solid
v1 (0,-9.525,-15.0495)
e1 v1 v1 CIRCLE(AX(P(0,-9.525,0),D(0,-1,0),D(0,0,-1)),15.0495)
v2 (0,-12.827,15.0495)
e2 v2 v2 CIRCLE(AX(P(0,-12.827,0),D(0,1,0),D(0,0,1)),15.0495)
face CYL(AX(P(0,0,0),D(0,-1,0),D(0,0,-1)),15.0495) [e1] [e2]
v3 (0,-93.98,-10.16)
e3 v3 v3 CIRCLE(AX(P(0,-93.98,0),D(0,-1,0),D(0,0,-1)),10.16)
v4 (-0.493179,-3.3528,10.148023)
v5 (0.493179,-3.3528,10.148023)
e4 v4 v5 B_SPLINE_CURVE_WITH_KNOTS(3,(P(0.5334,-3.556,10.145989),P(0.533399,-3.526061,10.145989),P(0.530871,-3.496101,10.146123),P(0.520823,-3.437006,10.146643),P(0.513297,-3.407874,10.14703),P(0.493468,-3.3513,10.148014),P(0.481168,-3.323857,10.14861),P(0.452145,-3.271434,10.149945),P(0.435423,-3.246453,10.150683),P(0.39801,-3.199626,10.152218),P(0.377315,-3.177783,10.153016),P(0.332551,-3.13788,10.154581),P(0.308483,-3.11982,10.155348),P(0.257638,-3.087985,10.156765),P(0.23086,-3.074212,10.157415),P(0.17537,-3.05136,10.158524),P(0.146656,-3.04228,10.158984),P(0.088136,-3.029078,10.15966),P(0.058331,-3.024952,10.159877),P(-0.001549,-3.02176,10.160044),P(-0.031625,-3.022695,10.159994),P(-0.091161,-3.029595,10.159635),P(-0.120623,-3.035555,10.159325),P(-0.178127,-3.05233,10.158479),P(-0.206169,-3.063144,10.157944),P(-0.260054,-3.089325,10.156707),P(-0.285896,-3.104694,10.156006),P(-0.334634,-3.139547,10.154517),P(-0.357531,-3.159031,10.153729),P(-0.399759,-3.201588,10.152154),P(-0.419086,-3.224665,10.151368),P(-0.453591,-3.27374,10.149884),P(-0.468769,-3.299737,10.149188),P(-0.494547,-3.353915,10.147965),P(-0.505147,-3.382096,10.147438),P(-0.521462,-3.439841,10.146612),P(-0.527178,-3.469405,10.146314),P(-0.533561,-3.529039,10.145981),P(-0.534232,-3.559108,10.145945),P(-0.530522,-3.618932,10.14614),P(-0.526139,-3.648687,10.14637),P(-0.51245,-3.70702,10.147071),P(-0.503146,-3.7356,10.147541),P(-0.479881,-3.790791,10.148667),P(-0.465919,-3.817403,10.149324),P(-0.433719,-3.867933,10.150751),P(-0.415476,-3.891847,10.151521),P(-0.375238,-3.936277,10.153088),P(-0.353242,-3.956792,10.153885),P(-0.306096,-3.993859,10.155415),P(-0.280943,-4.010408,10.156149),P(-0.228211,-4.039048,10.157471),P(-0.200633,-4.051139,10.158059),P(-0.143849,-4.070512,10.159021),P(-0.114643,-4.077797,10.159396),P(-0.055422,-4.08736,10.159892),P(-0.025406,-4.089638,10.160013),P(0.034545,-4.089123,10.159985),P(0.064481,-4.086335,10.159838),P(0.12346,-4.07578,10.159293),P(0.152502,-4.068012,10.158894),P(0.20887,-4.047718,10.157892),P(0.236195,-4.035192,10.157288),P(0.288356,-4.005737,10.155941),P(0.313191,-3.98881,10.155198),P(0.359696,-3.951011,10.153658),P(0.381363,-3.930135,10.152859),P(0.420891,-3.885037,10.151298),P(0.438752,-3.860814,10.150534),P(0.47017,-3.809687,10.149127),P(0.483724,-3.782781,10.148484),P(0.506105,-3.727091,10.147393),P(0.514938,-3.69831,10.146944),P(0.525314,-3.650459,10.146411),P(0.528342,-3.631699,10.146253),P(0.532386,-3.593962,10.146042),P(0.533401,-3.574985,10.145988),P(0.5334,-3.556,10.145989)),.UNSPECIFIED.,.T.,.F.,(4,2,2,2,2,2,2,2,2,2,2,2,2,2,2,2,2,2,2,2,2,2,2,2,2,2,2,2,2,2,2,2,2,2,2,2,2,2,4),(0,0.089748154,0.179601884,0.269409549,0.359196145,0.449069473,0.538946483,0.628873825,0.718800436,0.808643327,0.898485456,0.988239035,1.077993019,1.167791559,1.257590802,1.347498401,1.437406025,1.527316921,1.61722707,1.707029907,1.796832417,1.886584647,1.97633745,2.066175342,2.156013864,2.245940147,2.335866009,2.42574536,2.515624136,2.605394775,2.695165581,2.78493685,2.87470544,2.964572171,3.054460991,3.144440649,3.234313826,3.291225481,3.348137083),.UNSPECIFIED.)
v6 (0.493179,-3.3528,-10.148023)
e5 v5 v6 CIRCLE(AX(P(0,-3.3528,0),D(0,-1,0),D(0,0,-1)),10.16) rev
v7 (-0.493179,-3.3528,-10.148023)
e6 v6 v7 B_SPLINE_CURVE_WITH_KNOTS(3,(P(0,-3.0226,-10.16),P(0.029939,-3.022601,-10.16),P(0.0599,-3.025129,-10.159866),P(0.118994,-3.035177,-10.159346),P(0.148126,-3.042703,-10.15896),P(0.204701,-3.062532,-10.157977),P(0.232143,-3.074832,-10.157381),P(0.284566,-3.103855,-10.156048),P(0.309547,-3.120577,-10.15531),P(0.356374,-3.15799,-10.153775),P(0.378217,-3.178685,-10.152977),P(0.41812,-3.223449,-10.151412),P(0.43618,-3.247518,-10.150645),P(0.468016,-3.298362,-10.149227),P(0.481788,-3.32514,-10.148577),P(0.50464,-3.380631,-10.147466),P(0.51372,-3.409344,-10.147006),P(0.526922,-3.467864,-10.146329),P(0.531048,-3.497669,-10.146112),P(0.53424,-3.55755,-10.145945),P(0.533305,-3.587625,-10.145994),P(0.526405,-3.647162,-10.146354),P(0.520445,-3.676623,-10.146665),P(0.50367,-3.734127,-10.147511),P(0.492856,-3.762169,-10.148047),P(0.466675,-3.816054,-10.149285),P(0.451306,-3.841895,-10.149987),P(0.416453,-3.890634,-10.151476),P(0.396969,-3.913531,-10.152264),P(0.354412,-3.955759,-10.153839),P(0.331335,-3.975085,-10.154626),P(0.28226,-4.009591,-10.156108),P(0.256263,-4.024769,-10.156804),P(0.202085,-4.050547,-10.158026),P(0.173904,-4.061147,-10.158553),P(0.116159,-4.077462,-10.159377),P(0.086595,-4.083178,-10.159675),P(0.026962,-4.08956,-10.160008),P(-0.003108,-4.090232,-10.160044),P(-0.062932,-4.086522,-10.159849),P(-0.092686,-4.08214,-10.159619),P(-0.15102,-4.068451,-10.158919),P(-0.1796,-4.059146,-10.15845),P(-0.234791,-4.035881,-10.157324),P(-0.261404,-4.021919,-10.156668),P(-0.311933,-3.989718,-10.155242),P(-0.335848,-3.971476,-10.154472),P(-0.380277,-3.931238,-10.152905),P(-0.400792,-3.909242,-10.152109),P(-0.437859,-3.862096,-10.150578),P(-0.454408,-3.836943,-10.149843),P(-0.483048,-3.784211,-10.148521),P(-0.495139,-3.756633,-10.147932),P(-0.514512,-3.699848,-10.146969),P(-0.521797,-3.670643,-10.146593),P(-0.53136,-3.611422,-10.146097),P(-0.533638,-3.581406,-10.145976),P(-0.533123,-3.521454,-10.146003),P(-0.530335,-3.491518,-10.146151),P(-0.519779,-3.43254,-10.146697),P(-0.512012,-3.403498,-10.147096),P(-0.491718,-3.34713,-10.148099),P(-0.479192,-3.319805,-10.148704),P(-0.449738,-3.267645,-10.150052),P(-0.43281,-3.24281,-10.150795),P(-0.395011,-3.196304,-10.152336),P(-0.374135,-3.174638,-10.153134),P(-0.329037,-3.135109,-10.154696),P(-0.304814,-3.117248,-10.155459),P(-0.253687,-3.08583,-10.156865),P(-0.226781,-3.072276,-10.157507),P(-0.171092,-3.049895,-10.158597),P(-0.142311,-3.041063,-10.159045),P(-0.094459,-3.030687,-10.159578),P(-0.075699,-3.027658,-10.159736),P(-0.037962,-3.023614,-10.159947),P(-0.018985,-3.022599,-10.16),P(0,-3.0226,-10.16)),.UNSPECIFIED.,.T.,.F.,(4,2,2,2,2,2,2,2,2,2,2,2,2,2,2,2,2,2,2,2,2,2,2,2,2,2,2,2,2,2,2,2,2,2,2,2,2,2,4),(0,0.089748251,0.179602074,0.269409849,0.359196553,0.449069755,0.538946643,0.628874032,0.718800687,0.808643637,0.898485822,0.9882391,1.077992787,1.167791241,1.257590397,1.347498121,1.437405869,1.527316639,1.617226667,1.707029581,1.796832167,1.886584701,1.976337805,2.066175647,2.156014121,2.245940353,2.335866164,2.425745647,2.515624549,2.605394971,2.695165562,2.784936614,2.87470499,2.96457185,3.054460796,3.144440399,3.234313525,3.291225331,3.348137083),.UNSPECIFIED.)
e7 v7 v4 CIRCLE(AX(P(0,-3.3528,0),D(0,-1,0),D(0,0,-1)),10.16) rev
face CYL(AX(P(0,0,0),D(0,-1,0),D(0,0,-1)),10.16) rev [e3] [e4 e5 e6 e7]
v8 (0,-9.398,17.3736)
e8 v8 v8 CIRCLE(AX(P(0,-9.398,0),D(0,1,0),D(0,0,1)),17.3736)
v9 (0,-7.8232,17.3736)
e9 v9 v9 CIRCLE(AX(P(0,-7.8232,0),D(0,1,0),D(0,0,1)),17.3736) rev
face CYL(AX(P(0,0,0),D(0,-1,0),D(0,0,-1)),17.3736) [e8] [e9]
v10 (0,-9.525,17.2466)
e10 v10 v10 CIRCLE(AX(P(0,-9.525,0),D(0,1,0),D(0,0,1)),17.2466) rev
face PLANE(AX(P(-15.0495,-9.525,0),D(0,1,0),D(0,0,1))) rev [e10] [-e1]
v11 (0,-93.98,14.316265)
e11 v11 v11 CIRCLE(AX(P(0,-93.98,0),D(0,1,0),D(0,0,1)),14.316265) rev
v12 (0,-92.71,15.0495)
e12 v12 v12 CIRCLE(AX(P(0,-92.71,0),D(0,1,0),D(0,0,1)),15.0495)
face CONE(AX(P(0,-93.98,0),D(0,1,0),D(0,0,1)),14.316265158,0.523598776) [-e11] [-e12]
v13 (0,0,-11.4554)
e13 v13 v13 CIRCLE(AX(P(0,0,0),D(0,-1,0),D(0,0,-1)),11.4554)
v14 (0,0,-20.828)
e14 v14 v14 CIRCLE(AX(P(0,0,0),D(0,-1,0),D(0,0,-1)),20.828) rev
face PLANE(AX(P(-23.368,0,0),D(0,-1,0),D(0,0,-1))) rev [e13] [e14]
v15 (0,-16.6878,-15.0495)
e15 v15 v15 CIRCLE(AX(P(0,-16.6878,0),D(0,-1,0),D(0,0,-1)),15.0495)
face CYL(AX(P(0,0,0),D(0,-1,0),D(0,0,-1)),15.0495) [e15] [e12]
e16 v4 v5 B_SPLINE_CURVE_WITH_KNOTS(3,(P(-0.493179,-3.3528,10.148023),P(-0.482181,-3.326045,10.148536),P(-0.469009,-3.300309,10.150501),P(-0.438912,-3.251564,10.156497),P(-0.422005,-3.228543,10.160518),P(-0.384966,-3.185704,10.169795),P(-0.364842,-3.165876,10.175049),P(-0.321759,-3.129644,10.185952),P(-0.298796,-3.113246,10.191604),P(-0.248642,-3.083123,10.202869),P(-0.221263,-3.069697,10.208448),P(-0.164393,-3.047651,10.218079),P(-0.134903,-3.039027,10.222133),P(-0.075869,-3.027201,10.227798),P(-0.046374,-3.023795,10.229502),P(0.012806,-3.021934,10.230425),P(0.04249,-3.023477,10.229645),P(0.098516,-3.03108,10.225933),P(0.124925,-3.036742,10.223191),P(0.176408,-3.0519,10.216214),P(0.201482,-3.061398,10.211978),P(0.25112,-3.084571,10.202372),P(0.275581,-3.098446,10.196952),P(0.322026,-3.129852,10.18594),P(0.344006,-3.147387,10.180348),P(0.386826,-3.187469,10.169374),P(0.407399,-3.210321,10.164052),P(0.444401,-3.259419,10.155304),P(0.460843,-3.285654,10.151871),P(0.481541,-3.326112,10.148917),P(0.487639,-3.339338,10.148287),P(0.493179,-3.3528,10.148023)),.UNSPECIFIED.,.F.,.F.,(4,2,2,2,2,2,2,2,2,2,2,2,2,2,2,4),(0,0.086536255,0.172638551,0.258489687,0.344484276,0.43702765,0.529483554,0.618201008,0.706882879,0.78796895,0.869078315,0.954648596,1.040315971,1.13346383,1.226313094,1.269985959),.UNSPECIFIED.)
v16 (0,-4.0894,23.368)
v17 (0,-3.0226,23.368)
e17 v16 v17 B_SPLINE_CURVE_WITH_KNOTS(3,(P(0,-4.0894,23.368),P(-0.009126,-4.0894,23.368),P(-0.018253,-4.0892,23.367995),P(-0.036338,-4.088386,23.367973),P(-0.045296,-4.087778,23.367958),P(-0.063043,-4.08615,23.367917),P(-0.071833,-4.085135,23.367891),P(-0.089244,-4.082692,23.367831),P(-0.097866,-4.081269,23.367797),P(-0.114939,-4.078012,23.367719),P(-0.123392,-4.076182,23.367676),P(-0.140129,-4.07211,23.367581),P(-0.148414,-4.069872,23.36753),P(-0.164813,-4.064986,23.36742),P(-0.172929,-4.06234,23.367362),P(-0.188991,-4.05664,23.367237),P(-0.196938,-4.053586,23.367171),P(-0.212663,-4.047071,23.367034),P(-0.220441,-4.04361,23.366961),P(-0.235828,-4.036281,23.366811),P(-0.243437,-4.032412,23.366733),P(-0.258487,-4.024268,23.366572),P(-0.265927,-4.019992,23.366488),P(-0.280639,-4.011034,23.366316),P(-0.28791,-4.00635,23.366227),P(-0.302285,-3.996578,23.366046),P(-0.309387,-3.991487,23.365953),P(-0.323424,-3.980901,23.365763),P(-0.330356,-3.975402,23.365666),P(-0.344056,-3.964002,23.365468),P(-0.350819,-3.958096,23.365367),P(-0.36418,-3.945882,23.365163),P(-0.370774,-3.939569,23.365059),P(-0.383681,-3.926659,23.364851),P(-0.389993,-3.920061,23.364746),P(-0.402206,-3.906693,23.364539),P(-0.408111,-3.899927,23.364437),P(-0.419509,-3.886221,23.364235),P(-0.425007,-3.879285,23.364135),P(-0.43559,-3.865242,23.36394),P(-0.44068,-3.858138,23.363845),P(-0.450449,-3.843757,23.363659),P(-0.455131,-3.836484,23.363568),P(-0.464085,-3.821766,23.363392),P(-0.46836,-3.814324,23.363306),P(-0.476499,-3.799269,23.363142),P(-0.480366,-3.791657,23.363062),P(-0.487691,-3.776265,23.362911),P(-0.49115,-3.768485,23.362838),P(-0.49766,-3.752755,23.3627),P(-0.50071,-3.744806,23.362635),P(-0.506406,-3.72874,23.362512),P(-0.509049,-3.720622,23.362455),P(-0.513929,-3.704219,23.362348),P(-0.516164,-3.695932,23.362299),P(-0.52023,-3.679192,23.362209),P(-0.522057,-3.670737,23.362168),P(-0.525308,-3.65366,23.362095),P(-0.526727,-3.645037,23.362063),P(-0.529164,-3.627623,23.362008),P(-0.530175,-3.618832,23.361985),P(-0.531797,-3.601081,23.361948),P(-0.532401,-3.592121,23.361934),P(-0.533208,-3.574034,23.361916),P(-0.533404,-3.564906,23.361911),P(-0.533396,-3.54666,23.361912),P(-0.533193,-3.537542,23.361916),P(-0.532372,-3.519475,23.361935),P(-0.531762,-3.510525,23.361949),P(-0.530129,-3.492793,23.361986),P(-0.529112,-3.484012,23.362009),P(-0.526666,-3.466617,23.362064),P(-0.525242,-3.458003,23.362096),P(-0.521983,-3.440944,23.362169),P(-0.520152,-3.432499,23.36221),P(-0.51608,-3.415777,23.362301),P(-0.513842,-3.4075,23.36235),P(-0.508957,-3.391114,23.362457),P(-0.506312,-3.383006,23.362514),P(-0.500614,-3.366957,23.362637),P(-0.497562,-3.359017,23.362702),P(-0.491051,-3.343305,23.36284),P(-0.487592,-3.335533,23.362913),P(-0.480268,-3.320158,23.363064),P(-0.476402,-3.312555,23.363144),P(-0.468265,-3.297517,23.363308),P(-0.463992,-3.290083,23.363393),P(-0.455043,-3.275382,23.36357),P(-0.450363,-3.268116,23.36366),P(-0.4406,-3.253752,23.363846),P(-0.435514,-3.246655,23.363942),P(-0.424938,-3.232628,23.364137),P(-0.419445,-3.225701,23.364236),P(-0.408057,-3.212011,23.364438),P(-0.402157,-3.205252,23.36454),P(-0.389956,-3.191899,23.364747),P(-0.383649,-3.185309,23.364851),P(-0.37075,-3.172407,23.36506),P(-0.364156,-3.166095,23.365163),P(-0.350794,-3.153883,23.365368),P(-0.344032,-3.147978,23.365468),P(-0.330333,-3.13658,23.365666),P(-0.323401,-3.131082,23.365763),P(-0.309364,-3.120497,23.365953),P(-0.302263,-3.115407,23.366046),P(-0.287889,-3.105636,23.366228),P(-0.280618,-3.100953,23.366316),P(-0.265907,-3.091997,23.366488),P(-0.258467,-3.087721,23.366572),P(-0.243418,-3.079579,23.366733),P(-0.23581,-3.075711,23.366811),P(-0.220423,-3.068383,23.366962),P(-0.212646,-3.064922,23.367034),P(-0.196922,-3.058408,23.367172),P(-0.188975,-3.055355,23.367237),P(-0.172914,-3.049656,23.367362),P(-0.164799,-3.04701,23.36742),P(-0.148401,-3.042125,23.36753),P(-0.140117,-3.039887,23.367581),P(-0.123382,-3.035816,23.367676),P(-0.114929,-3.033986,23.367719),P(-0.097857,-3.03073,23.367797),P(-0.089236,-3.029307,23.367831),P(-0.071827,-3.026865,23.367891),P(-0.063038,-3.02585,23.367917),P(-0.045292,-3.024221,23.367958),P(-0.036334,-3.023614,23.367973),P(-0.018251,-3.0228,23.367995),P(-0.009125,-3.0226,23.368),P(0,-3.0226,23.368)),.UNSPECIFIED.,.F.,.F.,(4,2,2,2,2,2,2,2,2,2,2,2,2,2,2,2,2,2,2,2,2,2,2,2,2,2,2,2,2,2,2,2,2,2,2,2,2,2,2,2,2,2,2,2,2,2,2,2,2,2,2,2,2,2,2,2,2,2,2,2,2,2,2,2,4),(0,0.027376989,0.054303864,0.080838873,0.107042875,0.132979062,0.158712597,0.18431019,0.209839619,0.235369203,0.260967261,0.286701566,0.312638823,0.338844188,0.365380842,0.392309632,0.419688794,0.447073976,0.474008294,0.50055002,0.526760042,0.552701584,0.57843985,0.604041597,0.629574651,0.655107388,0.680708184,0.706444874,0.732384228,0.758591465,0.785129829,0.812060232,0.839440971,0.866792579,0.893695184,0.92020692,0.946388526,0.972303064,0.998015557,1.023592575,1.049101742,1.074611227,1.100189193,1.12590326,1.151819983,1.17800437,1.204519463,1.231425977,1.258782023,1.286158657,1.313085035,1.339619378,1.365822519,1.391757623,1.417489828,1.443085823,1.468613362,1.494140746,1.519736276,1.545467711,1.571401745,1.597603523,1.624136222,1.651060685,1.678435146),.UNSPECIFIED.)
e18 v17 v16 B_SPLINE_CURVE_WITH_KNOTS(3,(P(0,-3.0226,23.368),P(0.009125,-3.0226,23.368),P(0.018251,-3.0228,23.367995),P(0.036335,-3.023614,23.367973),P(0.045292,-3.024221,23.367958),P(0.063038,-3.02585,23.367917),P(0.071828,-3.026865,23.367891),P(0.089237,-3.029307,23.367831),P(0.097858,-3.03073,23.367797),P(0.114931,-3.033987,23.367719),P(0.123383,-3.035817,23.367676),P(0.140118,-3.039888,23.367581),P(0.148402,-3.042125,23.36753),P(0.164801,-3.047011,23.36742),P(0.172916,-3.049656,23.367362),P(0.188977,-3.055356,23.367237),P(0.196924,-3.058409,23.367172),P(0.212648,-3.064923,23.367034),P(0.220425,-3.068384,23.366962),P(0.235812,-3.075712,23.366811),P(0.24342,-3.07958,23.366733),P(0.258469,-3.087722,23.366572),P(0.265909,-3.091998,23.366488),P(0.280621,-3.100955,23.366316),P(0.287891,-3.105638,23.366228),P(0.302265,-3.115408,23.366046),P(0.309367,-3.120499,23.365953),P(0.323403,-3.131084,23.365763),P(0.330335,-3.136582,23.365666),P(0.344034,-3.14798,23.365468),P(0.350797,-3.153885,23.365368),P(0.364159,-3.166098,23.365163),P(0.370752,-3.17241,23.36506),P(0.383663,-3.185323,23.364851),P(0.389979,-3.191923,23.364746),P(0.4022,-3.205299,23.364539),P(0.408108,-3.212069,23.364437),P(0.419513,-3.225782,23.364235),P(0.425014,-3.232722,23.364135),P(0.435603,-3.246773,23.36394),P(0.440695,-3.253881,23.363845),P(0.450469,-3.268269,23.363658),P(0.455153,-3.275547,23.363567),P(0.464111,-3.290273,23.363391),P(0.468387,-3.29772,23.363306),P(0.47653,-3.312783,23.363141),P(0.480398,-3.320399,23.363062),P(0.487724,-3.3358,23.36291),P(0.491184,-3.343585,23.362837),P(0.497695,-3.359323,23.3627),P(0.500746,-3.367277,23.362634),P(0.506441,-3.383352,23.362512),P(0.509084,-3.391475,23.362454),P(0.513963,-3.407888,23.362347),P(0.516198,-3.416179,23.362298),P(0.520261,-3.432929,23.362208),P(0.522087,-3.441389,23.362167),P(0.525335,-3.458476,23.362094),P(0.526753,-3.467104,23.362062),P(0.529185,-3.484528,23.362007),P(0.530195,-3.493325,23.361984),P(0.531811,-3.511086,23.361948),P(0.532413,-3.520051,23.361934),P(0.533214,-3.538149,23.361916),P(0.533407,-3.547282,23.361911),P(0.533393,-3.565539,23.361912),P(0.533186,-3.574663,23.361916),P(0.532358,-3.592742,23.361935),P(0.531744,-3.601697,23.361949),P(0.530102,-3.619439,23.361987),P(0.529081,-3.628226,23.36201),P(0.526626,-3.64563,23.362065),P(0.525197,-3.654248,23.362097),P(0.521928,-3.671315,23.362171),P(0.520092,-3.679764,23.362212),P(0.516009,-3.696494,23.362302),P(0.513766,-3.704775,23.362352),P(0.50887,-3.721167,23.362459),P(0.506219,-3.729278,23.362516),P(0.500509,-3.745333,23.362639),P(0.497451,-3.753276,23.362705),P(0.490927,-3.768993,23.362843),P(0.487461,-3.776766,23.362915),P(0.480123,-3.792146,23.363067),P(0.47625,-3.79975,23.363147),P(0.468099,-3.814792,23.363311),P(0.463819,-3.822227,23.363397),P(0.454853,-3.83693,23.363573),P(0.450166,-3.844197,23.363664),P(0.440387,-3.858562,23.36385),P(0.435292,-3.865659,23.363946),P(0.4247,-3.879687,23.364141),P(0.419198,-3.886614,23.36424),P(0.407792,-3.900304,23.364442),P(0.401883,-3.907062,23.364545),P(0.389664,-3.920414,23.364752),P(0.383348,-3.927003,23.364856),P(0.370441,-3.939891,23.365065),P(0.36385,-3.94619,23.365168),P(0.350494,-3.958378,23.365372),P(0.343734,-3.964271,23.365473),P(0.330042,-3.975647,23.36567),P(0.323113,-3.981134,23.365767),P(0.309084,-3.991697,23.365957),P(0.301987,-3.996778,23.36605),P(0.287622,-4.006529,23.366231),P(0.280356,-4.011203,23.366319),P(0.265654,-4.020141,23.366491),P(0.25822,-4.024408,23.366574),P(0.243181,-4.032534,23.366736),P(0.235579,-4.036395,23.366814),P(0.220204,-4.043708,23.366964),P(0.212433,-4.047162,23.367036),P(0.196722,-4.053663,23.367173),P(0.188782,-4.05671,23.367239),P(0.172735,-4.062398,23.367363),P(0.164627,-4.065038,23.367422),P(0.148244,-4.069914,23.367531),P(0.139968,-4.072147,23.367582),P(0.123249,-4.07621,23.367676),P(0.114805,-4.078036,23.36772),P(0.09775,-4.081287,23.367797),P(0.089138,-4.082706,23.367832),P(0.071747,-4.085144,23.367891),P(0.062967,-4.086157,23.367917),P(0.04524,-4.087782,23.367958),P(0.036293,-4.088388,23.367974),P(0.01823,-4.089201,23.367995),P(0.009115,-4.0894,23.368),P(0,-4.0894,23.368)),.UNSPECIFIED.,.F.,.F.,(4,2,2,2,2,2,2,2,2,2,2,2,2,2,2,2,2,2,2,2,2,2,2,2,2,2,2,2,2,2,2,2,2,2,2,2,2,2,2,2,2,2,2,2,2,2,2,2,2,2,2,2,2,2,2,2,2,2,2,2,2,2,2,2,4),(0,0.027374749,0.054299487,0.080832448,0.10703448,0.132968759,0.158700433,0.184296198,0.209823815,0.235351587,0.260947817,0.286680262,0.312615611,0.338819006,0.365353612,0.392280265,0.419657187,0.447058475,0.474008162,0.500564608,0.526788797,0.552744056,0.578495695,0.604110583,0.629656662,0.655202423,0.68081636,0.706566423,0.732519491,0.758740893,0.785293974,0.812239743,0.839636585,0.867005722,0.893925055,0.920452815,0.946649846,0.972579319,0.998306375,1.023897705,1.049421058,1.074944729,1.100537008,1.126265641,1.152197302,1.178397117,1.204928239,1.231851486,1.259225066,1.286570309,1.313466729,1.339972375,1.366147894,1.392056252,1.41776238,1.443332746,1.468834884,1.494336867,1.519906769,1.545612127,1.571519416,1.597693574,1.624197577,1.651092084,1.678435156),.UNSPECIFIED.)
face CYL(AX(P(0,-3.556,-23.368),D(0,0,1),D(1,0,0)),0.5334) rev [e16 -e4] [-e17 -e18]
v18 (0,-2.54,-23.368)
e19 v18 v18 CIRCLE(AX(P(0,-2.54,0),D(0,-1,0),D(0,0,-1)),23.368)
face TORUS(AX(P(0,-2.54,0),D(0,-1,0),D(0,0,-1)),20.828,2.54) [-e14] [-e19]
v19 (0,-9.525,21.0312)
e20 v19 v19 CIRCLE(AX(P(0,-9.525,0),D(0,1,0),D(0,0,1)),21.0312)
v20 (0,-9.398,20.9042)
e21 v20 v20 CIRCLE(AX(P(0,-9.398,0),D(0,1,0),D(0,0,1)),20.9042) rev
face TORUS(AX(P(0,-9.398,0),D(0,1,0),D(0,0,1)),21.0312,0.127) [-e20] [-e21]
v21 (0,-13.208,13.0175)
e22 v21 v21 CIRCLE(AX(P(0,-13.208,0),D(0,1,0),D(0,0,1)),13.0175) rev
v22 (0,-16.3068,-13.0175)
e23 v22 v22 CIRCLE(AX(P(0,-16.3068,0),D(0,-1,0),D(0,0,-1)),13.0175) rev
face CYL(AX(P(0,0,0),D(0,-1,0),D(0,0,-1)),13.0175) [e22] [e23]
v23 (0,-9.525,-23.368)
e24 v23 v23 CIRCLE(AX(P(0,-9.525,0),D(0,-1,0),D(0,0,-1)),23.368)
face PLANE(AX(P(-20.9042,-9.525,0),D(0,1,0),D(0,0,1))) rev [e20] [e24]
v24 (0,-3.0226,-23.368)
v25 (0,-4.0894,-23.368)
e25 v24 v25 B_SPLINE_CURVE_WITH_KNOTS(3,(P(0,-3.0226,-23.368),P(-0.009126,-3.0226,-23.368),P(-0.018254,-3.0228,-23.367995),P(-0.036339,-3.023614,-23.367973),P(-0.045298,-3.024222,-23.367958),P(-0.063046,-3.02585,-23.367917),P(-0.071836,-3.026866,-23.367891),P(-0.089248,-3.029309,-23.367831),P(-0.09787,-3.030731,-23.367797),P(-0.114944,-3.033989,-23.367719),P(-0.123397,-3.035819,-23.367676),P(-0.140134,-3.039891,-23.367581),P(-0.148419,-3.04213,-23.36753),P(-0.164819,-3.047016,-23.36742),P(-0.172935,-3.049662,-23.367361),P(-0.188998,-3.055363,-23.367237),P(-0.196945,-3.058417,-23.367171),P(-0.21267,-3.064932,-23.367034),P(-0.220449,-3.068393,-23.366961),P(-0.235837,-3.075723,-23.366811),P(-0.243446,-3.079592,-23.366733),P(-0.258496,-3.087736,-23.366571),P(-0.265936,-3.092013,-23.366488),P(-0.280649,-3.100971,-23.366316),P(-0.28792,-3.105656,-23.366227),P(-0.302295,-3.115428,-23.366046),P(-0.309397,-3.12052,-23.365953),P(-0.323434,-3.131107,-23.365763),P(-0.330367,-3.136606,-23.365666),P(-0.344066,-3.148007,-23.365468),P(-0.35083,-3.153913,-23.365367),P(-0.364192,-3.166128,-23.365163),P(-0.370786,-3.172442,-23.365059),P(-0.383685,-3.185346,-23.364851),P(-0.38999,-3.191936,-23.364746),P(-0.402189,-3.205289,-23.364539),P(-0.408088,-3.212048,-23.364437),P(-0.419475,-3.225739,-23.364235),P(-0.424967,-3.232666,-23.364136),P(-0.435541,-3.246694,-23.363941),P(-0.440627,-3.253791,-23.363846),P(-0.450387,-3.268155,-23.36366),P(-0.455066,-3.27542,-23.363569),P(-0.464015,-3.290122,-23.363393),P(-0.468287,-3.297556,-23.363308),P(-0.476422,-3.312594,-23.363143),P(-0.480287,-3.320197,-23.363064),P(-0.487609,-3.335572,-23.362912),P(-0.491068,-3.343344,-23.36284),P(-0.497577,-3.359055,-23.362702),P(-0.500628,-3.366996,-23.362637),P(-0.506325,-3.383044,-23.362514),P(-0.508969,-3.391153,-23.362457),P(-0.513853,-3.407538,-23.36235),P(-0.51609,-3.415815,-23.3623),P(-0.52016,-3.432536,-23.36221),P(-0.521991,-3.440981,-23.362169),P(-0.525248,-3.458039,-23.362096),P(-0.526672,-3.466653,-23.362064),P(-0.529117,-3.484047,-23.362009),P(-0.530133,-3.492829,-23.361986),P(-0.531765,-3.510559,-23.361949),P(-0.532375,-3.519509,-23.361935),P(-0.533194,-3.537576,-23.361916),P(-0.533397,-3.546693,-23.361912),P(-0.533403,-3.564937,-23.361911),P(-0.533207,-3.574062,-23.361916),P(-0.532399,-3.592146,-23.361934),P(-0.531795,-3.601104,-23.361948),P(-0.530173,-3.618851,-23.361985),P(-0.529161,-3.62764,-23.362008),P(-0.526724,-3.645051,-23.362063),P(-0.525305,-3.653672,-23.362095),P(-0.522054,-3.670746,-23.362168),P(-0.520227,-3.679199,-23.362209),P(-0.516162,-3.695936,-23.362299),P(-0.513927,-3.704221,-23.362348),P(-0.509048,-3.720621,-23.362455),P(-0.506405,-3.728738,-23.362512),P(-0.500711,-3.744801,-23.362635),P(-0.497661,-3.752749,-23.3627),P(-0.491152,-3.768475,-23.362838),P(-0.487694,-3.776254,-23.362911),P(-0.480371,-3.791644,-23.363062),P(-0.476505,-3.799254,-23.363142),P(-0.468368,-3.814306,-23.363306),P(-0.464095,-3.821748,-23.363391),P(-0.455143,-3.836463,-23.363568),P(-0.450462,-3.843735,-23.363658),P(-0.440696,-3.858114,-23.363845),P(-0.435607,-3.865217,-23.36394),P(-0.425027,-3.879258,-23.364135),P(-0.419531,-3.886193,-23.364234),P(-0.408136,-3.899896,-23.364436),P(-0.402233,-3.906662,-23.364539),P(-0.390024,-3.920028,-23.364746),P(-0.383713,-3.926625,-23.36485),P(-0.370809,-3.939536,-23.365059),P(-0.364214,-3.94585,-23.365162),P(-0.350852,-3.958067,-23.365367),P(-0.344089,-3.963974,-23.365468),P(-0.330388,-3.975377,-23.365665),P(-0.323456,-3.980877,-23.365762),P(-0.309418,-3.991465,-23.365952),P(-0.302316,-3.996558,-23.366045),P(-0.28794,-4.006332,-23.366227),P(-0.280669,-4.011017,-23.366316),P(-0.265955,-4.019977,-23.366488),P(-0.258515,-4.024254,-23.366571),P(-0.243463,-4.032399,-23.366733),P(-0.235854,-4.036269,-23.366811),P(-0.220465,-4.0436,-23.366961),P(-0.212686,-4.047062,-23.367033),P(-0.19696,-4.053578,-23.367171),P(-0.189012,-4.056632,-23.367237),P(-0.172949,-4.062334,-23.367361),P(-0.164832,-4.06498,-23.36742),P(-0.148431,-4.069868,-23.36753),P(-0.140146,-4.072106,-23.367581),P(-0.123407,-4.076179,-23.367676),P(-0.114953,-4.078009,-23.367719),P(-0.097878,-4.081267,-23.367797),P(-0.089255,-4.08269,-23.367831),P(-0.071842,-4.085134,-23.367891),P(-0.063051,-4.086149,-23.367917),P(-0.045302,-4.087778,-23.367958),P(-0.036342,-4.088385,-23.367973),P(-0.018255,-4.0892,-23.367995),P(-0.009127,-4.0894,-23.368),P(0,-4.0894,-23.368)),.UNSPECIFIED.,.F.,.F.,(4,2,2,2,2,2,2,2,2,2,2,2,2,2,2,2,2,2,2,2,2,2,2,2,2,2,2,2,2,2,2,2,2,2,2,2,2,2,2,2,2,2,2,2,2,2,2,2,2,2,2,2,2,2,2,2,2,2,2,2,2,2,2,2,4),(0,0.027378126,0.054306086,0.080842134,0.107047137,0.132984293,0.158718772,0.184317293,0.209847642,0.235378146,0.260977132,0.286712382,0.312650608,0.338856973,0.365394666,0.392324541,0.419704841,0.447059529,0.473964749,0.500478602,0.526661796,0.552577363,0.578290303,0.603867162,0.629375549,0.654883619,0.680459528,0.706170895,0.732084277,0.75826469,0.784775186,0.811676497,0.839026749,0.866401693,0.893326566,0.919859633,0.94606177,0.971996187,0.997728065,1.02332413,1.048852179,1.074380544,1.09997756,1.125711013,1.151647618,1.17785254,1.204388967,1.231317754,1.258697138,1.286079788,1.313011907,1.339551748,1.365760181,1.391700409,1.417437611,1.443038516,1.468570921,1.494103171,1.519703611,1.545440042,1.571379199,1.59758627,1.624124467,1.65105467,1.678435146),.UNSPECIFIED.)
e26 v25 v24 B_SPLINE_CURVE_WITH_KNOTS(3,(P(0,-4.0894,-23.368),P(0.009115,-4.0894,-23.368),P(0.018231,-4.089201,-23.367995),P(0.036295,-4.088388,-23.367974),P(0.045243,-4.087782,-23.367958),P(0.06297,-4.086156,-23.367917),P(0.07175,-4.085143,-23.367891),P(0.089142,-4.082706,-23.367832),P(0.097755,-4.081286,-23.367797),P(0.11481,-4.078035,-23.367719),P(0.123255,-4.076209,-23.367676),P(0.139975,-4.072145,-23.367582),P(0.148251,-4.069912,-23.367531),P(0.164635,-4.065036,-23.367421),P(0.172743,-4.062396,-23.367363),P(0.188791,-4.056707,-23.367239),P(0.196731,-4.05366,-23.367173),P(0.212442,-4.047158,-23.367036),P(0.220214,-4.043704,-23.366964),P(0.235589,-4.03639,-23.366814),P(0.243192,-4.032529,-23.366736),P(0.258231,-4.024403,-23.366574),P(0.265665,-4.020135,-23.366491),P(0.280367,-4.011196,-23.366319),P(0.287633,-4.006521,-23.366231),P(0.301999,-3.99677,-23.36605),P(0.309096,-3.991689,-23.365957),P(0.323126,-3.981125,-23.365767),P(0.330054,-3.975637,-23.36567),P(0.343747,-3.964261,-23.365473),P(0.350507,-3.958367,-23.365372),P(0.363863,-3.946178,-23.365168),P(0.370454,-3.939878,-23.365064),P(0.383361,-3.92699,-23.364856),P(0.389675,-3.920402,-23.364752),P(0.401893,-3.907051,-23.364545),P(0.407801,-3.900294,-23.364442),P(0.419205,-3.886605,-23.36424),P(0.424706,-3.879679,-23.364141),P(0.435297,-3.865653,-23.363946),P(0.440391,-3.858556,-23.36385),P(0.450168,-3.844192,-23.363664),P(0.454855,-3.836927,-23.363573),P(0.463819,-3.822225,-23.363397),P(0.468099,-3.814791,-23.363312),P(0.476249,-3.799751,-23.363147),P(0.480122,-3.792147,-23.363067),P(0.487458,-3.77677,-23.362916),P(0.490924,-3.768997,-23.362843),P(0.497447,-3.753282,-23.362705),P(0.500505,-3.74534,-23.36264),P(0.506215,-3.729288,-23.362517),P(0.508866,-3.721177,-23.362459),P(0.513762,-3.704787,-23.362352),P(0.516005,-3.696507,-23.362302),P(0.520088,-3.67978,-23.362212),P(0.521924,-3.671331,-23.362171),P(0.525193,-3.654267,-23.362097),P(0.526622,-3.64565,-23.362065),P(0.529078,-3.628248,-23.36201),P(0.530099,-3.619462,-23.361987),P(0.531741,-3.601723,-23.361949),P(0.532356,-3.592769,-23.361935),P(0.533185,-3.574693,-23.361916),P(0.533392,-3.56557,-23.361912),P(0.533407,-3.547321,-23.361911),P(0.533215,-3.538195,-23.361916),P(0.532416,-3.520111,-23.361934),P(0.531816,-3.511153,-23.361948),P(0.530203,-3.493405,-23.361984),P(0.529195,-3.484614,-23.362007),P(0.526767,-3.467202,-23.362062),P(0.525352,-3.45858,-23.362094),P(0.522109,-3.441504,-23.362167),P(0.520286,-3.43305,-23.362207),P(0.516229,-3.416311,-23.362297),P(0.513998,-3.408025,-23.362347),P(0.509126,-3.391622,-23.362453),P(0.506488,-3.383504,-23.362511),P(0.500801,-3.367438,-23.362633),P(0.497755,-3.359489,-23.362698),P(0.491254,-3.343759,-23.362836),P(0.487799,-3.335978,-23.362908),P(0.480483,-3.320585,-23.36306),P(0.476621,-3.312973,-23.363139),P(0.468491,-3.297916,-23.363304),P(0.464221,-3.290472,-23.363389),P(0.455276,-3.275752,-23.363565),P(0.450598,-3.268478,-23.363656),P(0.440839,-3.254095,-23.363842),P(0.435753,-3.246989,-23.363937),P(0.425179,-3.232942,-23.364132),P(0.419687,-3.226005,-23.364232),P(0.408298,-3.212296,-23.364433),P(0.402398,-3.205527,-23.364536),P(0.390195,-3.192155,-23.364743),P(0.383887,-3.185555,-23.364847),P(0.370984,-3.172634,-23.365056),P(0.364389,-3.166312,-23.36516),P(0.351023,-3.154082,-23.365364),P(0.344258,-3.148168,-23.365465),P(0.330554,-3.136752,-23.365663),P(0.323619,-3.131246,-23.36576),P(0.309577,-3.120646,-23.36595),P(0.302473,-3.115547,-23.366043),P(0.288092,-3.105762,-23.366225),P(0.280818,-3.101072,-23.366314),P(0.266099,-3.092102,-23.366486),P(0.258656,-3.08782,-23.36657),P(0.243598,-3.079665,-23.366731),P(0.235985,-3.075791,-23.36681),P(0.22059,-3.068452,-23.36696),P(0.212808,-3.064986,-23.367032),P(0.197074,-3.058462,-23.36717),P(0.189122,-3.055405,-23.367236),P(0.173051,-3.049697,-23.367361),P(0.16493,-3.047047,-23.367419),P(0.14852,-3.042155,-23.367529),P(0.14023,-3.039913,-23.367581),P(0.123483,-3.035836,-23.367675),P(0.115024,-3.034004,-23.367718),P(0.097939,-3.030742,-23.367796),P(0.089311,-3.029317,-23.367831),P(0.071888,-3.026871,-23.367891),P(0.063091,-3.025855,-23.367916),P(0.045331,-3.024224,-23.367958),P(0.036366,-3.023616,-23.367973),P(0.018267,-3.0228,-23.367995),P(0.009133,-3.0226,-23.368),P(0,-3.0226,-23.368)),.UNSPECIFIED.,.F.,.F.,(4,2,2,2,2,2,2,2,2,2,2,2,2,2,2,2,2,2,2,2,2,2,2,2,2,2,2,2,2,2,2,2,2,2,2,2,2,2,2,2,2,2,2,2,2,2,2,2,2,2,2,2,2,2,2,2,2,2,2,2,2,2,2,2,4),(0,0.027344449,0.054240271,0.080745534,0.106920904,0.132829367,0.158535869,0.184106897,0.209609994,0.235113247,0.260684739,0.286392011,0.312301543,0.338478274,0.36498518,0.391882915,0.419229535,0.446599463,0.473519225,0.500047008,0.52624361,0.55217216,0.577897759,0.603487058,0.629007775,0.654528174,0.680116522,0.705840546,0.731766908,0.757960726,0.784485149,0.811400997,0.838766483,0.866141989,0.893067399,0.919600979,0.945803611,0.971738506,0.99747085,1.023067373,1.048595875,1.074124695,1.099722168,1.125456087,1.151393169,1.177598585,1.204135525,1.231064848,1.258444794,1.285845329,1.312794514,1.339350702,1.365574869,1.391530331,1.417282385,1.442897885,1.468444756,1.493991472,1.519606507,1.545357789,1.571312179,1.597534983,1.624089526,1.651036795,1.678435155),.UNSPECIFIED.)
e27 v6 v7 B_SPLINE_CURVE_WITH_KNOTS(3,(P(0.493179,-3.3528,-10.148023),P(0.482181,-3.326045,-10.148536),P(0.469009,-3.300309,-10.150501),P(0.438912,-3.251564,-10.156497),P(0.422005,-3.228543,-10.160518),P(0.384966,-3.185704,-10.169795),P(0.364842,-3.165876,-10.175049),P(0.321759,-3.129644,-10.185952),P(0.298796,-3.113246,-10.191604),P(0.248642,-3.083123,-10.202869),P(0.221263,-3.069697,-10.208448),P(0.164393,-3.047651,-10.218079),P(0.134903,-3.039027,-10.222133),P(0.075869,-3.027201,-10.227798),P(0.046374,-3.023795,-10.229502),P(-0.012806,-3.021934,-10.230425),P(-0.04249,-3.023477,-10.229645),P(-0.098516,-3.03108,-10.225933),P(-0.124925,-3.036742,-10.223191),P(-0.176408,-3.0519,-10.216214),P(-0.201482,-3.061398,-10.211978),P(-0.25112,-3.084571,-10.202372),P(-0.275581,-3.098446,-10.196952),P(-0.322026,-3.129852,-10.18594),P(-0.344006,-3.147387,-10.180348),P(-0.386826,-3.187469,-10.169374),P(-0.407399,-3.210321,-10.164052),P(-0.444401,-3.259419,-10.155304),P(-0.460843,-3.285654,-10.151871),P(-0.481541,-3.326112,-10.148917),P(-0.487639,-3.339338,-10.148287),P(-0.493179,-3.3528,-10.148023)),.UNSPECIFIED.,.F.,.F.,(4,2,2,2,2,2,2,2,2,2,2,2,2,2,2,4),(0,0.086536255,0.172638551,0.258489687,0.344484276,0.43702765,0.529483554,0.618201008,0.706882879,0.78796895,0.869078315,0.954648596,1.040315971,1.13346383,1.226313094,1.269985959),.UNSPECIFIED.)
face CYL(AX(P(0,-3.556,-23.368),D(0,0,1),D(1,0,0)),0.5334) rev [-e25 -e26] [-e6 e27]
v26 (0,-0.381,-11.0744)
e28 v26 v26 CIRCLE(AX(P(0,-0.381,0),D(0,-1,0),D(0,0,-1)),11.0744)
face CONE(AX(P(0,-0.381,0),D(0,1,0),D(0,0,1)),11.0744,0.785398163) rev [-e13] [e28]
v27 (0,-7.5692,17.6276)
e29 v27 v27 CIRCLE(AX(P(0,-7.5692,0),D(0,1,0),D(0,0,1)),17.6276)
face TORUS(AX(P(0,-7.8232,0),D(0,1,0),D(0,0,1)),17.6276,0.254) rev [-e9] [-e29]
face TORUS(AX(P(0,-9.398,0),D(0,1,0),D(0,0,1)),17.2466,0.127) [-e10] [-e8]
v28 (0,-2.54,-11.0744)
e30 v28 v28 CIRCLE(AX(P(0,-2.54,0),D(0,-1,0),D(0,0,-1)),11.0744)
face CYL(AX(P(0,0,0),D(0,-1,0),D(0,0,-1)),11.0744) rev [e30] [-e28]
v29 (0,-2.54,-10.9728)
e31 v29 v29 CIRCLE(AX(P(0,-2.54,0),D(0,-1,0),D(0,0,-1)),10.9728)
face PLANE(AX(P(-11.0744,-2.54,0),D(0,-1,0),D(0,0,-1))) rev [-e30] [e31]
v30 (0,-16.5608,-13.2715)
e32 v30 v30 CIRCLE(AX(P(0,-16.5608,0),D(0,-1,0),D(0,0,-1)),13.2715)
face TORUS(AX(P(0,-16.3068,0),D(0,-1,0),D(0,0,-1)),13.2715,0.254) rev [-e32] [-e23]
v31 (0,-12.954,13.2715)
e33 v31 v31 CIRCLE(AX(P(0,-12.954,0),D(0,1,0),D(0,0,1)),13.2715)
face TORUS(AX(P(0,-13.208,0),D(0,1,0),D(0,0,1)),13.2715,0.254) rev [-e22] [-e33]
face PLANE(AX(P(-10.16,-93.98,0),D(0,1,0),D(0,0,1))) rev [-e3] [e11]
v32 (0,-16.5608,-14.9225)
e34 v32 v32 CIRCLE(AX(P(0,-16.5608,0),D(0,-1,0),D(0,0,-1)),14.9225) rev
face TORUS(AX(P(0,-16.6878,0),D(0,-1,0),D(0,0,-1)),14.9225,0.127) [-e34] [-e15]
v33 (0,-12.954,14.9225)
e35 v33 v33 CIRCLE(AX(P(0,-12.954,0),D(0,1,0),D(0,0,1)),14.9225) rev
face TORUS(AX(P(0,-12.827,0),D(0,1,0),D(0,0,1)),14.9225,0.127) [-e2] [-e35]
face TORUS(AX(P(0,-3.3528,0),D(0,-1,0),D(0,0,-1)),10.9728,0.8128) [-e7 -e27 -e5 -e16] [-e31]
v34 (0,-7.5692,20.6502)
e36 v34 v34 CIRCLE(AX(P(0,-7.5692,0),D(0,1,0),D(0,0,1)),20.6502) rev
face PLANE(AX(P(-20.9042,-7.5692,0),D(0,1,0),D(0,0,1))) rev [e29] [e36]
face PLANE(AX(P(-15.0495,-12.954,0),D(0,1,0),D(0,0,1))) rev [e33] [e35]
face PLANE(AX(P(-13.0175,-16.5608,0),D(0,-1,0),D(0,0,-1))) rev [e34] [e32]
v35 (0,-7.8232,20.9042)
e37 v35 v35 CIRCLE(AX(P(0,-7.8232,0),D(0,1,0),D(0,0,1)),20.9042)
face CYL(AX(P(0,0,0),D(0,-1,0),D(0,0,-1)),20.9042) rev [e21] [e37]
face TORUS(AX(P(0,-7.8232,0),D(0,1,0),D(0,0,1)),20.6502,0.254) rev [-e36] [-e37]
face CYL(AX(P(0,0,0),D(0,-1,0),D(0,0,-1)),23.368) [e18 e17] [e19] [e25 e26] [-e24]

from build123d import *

# Parameters (mm, degrees)
CUT_EXTRUDE1_DEPTH      = 100.621118484
CUT_EXTRUDE1_DEPTH_BACK = 100.621118484
SKETCH2_R               = 0.5334
FILLET2_R               = 0.8128
FILLET3_R               = 2.54
CHAMFER1_SIZE           = 1.27
CHAMFER1_SIZE2          = 0.733234842
FILLET5_R               = 0.254
FILLET6_R               = 0.127
FILLET7_R               = 0.254


with BuildPart() as part:
    # Sketch1 → Revolve1 (revolve)
    with BuildSketch(Plane.XY, mode=Mode.PRIVATE) as revolve1_sk:
        Polygon((-11.0744, -0.381), (-11.0744, -2.54), (-10.16, -2.54), (-10.16, -93.98), (-15.0495, -93.98), (-15.0495, -16.5608), (-13.0175, -16.5608), (-13.0175, -12.954), (-15.0495, -12.954), (-15.0495, -9.525), (-17.3736, -9.525), (-17.3736, -7.5692), (-20.9042, -7.5692), (-20.9042, -9.525), (-23.368, -9.525), (-23.368, 0), (-11.4554, 0), align=None)
    revolve(revolve1_sk.sketch.rotate(Axis((0, 0, 0), (0, 1, 0)), 270), axis=Axis((0, 0, 0), (0, 1, 0)))

    # Sketch2 → Cut-Extrude1 (cut, two sides: drawn at the far end of the back side and taken through both)
    with BuildSketch(Plane.XY.offset(-CUT_EXTRUDE1_DEPTH_BACK)):
        with Locations((0, -3.556)):
            Circle(SKETCH2_R)
    extrude(amount=CUT_EXTRUDE1_DEPTH + CUT_EXTRUDE1_DEPTH_BACK, mode=Mode.SUBTRACT)

    # Fillet2
    # the kernel refuses this fillet: 0.8128 mm, written as the material it takes off along each edge
    with BuildSketch(Plane(origin=(0, -2.54, 0), x_dir=(0, 0, -1), z_dir=(1, 0, 0))) as fillet2_piece_1:
        with BuildLine():
            CenterArc((10.16 + FILLET2_R, -FILLET2_R), FILLET2_R, 90, 90)
            Line((10.16, -FILLET2_R), (10.16, 0))
            Line((10.16, 0), (10.16 + FILLET2_R, 0))
        make_face()
    revolve(axis=Axis((0, -2.54, 0), (0, 1, 0)), mode=Mode.SUBTRACT)

    # Fillet3
    fillet3_edges = [part.edges().sort_by_distance(p)[0] for p in [
        (0, 0, 23.368),
    ]]
    fillet(fillet3_edges, radius=FILLET3_R)

    # Chamfer1
    chamfer1_edges = [part.edges().sort_by_distance(p)[0] for p in [
        (0, -93.98, 15.0495),
    ]]
    chamfer1_side = [part.faces().sort_by_distance(p)[0] for p in [
        (0, -55.2704, 15.0495),
    ]]
    chamfer(chamfer1_edges, length=CHAMFER1_SIZE, length2=CHAMFER1_SIZE2, reference=chamfer1_side[0])

    # Fillet5
    fillet5_edges = [part.edges().sort_by_distance(p)[0] for p in [
        (0, -12.954, 13.0175),
        (0, -16.5608, 13.0175),
    ]]
    fillet(fillet5_edges, radius=FILLET5_R)

    # Fillet6
    fillet6_edges = [part.edges().sort_by_distance(p)[0] for p in [
        (0, -9.525, 20.9042),
        (0, -9.525, 17.3736),
        (0, -12.954, 15.0495),
        (0, -16.5608, 15.0495),
    ]]
    fillet(fillet6_edges, radius=FILLET6_R)

    # Fillet7
    fillet7_edges = [part.edges().sort_by_distance(p)[0] for p in [
        (0, -7.5692, 20.9042),
        (0, -7.5692, 17.3736),
    ]]
    fillet(fillet7_edges, radius=FILLET7_R)


solid = part.part
